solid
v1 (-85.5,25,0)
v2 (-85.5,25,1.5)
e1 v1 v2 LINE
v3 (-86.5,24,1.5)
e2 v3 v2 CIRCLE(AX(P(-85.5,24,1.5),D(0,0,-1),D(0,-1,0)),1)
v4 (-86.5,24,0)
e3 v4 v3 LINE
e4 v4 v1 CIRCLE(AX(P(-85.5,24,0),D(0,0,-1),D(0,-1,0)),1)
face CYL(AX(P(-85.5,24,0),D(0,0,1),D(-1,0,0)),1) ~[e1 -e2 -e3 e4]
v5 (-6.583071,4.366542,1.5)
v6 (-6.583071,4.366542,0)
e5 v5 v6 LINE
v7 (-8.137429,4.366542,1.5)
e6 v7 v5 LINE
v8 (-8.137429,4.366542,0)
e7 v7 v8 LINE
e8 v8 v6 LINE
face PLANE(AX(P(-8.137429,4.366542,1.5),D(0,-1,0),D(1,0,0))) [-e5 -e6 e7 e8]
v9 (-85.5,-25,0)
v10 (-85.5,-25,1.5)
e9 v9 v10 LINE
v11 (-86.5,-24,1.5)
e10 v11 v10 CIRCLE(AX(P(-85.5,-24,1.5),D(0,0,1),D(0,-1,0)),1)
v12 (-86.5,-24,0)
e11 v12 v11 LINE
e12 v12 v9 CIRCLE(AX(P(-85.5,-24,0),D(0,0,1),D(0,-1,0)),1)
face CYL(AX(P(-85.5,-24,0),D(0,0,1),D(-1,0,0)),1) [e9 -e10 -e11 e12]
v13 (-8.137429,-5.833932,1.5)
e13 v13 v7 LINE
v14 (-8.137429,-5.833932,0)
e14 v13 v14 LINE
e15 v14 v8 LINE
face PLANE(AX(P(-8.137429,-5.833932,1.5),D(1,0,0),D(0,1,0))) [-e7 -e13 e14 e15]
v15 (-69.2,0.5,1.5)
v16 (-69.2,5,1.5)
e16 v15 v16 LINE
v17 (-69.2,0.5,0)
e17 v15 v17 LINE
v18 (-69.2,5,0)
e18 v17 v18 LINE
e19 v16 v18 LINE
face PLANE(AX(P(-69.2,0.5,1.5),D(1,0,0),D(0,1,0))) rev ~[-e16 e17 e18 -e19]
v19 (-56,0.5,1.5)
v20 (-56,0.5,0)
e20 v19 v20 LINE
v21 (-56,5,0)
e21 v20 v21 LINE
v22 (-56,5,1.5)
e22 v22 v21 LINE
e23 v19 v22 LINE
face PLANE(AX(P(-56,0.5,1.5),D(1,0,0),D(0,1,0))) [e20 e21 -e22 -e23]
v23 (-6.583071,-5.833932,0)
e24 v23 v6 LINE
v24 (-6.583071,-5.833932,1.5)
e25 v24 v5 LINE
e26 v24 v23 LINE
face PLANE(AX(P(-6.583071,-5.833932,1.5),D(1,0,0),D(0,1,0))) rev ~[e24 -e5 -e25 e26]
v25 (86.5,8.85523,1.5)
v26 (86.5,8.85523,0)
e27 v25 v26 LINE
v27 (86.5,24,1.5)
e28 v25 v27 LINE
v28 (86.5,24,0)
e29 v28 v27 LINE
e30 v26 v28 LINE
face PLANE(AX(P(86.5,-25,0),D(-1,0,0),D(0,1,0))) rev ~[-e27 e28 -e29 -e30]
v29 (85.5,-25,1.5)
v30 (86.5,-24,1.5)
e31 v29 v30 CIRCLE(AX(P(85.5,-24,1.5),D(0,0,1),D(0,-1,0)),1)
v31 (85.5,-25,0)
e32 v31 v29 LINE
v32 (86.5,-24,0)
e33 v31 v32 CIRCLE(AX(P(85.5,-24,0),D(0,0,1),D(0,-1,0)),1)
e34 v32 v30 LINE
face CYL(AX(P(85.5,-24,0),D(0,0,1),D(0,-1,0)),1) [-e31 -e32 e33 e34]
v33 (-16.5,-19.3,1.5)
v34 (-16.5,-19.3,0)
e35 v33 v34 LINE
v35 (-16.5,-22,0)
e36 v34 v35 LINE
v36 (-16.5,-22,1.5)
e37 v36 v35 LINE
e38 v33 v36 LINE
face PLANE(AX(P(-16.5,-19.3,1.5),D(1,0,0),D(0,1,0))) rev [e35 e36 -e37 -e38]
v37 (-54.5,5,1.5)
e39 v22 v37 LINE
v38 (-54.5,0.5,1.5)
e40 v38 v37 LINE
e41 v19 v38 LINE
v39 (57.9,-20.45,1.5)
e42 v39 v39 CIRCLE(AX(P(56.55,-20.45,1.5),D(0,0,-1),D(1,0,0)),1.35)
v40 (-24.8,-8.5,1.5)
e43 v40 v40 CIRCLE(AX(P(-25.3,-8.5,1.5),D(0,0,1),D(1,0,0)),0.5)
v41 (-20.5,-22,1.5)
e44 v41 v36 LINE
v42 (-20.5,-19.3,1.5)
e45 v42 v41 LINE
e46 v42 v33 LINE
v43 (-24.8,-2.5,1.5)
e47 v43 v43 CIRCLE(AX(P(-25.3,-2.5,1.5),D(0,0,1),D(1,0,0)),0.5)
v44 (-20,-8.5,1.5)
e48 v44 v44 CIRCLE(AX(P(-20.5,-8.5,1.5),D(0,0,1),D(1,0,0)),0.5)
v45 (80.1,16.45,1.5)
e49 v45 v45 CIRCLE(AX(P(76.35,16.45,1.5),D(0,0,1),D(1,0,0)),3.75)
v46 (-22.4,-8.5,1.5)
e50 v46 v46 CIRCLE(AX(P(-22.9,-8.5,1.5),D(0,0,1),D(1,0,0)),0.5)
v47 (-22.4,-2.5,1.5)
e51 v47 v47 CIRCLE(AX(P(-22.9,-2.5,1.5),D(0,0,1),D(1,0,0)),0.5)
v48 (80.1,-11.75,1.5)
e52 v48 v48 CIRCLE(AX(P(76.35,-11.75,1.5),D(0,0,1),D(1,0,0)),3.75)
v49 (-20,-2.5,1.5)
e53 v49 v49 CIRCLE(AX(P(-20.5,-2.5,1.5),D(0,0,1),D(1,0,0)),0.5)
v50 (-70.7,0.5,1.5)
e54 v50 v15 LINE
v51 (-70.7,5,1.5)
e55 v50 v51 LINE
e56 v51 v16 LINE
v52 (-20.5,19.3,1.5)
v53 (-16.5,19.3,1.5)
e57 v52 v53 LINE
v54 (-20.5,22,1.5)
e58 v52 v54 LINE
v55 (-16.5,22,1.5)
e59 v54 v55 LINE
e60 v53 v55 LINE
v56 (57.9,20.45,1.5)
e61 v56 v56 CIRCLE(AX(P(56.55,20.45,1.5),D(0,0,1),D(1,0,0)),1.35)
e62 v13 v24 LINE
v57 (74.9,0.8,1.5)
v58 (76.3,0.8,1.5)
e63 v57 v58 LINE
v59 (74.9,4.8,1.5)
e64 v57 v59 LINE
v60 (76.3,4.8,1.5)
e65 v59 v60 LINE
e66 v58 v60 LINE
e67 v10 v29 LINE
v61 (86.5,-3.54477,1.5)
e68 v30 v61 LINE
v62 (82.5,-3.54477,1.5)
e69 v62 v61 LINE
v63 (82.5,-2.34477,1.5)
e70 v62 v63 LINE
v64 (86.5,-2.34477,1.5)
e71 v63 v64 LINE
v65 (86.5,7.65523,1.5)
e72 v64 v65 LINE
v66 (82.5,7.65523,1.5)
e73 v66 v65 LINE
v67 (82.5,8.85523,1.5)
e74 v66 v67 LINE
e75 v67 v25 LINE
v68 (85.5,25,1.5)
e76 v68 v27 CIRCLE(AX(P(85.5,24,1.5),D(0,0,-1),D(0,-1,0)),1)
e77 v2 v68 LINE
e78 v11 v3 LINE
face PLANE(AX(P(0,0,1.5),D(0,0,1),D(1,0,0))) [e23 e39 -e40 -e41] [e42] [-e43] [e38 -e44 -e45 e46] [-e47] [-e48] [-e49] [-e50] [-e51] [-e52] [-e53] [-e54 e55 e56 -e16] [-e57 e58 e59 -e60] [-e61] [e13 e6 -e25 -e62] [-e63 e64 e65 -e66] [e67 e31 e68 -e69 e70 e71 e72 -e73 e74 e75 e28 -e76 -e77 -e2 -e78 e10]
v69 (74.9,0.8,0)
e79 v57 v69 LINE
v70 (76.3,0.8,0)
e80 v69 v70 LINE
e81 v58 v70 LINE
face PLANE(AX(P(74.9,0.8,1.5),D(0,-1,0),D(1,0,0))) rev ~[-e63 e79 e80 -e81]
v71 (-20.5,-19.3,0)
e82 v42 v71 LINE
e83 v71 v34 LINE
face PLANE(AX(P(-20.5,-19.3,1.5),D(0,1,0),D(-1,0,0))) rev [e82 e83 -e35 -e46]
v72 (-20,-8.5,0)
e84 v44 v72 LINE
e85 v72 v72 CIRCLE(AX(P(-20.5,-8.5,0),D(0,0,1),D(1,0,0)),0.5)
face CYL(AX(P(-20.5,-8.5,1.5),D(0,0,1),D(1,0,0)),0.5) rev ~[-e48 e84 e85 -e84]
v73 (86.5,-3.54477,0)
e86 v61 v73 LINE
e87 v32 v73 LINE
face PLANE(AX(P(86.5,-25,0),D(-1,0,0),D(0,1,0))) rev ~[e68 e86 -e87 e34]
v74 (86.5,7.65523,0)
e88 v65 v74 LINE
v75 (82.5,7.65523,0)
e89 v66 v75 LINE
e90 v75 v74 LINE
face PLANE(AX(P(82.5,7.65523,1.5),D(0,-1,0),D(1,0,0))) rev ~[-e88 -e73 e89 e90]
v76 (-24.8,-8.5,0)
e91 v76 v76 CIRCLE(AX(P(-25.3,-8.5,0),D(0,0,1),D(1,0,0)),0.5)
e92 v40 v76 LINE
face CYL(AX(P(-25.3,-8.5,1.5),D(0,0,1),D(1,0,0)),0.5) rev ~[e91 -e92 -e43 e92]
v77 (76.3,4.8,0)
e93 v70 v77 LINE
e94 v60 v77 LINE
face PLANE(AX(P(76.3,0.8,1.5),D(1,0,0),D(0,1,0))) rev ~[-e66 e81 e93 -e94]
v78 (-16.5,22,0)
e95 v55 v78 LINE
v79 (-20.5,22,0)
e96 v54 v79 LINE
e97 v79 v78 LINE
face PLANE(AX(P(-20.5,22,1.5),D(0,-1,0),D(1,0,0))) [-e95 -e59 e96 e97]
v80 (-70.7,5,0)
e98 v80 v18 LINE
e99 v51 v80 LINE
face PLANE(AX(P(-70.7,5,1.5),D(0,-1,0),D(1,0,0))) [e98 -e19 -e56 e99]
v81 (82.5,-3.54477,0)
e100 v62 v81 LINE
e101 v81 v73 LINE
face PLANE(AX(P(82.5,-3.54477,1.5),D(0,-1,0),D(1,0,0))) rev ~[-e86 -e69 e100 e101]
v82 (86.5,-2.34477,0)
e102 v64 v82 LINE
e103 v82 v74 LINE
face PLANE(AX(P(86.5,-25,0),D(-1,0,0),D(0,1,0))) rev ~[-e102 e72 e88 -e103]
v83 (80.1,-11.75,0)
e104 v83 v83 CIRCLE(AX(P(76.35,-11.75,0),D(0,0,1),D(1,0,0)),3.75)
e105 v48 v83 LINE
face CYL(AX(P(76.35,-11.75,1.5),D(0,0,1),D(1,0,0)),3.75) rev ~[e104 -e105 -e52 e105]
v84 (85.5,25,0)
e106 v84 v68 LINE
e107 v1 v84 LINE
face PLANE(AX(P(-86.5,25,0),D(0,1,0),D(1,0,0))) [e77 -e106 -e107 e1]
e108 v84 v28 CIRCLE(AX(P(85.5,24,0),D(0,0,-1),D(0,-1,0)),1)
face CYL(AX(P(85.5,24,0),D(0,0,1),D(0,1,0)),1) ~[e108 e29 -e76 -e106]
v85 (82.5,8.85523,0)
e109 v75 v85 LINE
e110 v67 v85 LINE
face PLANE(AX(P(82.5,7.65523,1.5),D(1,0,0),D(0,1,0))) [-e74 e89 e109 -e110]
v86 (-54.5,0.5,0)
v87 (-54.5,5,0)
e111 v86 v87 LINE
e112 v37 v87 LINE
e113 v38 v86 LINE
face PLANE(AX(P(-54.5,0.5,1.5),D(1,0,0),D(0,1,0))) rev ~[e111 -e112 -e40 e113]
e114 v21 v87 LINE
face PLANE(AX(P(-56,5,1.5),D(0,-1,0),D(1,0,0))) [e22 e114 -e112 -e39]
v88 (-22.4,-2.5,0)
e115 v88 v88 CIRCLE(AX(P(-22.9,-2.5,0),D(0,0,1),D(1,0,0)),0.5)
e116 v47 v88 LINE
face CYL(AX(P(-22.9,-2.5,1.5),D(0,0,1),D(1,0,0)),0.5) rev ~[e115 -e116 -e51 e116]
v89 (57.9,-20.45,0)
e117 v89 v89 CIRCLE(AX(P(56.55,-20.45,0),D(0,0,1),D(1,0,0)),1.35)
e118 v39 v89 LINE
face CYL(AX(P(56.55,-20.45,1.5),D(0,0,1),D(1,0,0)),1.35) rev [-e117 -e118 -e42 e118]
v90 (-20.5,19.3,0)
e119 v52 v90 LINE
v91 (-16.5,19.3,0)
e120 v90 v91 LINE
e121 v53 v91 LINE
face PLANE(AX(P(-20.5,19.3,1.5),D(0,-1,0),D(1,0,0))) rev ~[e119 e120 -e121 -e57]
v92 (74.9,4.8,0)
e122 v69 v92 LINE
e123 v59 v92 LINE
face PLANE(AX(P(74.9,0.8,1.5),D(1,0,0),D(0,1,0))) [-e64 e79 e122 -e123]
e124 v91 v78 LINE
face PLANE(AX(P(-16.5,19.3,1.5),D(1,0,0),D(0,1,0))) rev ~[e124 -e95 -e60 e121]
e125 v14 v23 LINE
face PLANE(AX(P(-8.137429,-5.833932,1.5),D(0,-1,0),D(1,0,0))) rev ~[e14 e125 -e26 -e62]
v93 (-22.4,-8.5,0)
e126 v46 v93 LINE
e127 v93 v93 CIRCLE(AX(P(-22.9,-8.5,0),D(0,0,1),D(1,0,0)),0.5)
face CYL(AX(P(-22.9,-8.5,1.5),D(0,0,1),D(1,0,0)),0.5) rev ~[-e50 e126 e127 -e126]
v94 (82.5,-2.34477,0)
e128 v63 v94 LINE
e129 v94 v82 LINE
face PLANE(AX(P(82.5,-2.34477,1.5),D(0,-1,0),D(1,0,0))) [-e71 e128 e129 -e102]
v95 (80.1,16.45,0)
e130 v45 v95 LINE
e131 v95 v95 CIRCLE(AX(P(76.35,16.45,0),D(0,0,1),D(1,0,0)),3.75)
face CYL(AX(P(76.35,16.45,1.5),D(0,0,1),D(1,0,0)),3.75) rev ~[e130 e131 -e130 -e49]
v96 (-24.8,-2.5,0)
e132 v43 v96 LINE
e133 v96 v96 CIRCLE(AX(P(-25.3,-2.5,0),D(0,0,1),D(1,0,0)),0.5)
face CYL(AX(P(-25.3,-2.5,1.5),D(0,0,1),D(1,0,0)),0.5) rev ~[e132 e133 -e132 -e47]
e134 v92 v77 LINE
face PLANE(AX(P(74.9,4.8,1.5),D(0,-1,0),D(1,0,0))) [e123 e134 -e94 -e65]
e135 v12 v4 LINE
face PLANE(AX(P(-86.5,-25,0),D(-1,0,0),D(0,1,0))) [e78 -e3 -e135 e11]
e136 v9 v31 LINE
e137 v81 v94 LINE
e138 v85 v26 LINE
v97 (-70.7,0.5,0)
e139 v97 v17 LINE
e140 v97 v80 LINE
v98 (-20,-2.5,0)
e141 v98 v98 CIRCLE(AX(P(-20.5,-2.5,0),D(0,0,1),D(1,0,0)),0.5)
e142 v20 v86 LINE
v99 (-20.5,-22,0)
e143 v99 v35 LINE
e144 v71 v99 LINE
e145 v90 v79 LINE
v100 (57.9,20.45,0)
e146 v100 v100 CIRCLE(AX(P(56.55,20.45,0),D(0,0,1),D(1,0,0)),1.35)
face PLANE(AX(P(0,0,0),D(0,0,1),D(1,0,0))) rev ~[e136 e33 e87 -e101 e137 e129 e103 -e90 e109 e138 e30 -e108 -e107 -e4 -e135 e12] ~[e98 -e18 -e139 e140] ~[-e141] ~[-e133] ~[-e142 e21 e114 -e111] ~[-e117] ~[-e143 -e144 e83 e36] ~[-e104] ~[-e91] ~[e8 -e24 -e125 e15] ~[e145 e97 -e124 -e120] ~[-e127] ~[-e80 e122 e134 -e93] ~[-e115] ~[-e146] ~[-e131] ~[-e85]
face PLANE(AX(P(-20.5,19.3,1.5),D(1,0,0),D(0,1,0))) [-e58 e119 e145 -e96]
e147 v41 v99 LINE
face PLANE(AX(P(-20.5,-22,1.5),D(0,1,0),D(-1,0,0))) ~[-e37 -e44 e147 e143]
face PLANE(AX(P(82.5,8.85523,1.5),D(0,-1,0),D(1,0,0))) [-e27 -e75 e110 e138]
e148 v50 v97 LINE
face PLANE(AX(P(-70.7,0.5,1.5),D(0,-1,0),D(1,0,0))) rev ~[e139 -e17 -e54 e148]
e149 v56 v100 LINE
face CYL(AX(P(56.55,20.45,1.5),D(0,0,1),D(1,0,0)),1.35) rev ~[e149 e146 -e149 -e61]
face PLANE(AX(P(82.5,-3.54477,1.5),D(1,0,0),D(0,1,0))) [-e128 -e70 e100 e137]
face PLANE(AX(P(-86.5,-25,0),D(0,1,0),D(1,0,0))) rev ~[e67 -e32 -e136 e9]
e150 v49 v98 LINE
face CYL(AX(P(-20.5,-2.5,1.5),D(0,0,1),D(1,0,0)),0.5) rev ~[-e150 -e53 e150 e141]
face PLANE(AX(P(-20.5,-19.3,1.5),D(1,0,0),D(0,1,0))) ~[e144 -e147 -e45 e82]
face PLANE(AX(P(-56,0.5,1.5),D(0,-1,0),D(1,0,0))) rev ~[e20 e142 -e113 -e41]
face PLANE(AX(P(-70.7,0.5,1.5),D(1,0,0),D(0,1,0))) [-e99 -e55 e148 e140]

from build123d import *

# Parameters (mm, degrees)
F0_W      = 173
F0_H      = 50
F1_DEPTH  = 1.5
F2_W      = 1.5
F2_H      = 4.5
F4_DEPTH  = 1.501
F3_W      = 1.5
F3_H      = 4.5
F5_DEPTH  = 1.501
F6_W      = 4
F6_H      = 2.7
F7_DEPTH  = 1.501
F8_R      = 1.35
F9_DEPTH  = 1.501
F10_R     = 3.75
F11_DEPTH = 1.501
F12_W     = 4
F12_H     = 1.2
F13_DEPTH = 1.501
F14_W     = 1.4
F14_H     = 4
F15_DEPTH = 1.501
F16_R     = 1
F17_R     = 0.5
F18_DEPTH = 1.501
F19_W     = 1.5543582849
F19_H     = 10.2004739456
F20_DEPTH = 1.501


# Not quite as in the source:
# - a pattern or mirror of a feature is missing from the dataset's text; its kind, count and spacing are read off the source's solid


with BuildPart() as f1:
    # F0 (on Top) → F1 (new body)
    with BuildSketch(Plane.XY):
        Rectangle(F0_W, F0_H)
    extrude(amount=F1_DEPTH)

    # F2 (on face) → F4 (cut, through all)
    with BuildSketch(Plane.XY.offset(1.5)):
        with Locations((-69.95, 2.75)):
            Rectangle(F2_W, F2_H)
    extrude(amount=-F4_DEPTH, mode=Mode.SUBTRACT)

    # F3 (on face) → F5 (cut, through all)
    with BuildSketch(Plane.XY.offset(1.5)):
        with Locations((-55.25, 2.75)):
            Rectangle(F3_W, F3_H)
    extrude(amount=-F5_DEPTH, mode=Mode.SUBTRACT)

    # F6 (on face) → F7 (cut, through all)
    with BuildSketch(Plane.XY.offset(1.5)):
        with Locations((-18.5, 20.65)):
            Rectangle(F6_W, F6_H)
    f7 = extrude(amount=-F7_DEPTH, mode=Mode.SUBTRACT)

    # F7_copies: F7 across plane
    add(f7.mirror(Plane(origin=(0, 0, 0), x_dir=(0, 0, -1), z_dir=(0, -1, 0))), mode=Mode.SUBTRACT)

    # F8 (on face) → F9 (cut, through all)
    with BuildSketch(Plane.XY.offset(1.5)):
        with Locations((56.55, 20.45)):
            Circle(F8_R)
    f9 = extrude(amount=-F9_DEPTH, mode=Mode.SUBTRACT)

    # F9_copies: F9 across plane
    add(f9.mirror(Plane(origin=(0, 0, 0), x_dir=(0, 0, -1), z_dir=(0, -1, 0))), mode=Mode.SUBTRACT)

    # F10 (on face) → F11 (cut, through all)
    with BuildSketch(Plane.XY.offset(1.5)):
        with Locations((76.35, 16.45)):
            Circle(F10_R)
        with Locations((76.35, -11.75)):
            Circle(F10_R)
    extrude(amount=-F11_DEPTH, mode=Mode.SUBTRACT)

    # F12 (on face) → F13 (cut, through all)
    with BuildSketch(Plane.XY.offset(1.5)):
        with Locations((84.5, 8.2552298188)):
            Rectangle(F12_W, F12_H)
        with Locations((84.5, -2.9447701812)):
            Rectangle(F12_W, F12_H)
    extrude(amount=-F13_DEPTH, mode=Mode.SUBTRACT)

    # F14 (on face) → F15 (cut, through all)
    with BuildSketch(Plane.XY.offset(1.5)):
        with Locations((75.6, 2.8)):
            Rectangle(F14_W, F14_H)
    extrude(amount=-F15_DEPTH, mode=Mode.SUBTRACT)

    # F16
    f16_edges = [f1.edges().sort_by_distance(p)[0] for p in [
        (-86.5, -25, 0.75),
        (-86.5, 25, 0.75),
        (86.5, 25, 0.75),
        (86.5, -25, 0.75),
    ]]
    fillet(f16_edges, radius=F16_R)

    # F17 (on face) → F18 (cut, through all)
    with BuildSketch(Plane.XY.offset(1.5)):
        with Locations((-25.3, -2.5)):
            Circle(F17_R)
        with Locations((-22.9, -2.5)):
            Circle(F17_R)
        with Locations((-20.5, -2.5)):
            Circle(F17_R)
        with Locations((-20.5, -8.5)):
            Circle(F17_R)
        with Locations((-22.9, -8.5)):
            Circle(F17_R)
        with Locations((-25.3, -8.5)):
            Circle(F17_R)
    extrude(amount=-F18_DEPTH, mode=Mode.SUBTRACT)

    # F19 (on face) → F20 (cut, through all)
    with BuildSketch(Plane.XY.offset(1.5)):
        with Locations((-7.3602499906, -0.7336952258)):
            Rectangle(F19_W, F19_H)
    extrude(amount=-F20_DEPTH, mode=Mode.SUBTRACT)


solid = f1.part
